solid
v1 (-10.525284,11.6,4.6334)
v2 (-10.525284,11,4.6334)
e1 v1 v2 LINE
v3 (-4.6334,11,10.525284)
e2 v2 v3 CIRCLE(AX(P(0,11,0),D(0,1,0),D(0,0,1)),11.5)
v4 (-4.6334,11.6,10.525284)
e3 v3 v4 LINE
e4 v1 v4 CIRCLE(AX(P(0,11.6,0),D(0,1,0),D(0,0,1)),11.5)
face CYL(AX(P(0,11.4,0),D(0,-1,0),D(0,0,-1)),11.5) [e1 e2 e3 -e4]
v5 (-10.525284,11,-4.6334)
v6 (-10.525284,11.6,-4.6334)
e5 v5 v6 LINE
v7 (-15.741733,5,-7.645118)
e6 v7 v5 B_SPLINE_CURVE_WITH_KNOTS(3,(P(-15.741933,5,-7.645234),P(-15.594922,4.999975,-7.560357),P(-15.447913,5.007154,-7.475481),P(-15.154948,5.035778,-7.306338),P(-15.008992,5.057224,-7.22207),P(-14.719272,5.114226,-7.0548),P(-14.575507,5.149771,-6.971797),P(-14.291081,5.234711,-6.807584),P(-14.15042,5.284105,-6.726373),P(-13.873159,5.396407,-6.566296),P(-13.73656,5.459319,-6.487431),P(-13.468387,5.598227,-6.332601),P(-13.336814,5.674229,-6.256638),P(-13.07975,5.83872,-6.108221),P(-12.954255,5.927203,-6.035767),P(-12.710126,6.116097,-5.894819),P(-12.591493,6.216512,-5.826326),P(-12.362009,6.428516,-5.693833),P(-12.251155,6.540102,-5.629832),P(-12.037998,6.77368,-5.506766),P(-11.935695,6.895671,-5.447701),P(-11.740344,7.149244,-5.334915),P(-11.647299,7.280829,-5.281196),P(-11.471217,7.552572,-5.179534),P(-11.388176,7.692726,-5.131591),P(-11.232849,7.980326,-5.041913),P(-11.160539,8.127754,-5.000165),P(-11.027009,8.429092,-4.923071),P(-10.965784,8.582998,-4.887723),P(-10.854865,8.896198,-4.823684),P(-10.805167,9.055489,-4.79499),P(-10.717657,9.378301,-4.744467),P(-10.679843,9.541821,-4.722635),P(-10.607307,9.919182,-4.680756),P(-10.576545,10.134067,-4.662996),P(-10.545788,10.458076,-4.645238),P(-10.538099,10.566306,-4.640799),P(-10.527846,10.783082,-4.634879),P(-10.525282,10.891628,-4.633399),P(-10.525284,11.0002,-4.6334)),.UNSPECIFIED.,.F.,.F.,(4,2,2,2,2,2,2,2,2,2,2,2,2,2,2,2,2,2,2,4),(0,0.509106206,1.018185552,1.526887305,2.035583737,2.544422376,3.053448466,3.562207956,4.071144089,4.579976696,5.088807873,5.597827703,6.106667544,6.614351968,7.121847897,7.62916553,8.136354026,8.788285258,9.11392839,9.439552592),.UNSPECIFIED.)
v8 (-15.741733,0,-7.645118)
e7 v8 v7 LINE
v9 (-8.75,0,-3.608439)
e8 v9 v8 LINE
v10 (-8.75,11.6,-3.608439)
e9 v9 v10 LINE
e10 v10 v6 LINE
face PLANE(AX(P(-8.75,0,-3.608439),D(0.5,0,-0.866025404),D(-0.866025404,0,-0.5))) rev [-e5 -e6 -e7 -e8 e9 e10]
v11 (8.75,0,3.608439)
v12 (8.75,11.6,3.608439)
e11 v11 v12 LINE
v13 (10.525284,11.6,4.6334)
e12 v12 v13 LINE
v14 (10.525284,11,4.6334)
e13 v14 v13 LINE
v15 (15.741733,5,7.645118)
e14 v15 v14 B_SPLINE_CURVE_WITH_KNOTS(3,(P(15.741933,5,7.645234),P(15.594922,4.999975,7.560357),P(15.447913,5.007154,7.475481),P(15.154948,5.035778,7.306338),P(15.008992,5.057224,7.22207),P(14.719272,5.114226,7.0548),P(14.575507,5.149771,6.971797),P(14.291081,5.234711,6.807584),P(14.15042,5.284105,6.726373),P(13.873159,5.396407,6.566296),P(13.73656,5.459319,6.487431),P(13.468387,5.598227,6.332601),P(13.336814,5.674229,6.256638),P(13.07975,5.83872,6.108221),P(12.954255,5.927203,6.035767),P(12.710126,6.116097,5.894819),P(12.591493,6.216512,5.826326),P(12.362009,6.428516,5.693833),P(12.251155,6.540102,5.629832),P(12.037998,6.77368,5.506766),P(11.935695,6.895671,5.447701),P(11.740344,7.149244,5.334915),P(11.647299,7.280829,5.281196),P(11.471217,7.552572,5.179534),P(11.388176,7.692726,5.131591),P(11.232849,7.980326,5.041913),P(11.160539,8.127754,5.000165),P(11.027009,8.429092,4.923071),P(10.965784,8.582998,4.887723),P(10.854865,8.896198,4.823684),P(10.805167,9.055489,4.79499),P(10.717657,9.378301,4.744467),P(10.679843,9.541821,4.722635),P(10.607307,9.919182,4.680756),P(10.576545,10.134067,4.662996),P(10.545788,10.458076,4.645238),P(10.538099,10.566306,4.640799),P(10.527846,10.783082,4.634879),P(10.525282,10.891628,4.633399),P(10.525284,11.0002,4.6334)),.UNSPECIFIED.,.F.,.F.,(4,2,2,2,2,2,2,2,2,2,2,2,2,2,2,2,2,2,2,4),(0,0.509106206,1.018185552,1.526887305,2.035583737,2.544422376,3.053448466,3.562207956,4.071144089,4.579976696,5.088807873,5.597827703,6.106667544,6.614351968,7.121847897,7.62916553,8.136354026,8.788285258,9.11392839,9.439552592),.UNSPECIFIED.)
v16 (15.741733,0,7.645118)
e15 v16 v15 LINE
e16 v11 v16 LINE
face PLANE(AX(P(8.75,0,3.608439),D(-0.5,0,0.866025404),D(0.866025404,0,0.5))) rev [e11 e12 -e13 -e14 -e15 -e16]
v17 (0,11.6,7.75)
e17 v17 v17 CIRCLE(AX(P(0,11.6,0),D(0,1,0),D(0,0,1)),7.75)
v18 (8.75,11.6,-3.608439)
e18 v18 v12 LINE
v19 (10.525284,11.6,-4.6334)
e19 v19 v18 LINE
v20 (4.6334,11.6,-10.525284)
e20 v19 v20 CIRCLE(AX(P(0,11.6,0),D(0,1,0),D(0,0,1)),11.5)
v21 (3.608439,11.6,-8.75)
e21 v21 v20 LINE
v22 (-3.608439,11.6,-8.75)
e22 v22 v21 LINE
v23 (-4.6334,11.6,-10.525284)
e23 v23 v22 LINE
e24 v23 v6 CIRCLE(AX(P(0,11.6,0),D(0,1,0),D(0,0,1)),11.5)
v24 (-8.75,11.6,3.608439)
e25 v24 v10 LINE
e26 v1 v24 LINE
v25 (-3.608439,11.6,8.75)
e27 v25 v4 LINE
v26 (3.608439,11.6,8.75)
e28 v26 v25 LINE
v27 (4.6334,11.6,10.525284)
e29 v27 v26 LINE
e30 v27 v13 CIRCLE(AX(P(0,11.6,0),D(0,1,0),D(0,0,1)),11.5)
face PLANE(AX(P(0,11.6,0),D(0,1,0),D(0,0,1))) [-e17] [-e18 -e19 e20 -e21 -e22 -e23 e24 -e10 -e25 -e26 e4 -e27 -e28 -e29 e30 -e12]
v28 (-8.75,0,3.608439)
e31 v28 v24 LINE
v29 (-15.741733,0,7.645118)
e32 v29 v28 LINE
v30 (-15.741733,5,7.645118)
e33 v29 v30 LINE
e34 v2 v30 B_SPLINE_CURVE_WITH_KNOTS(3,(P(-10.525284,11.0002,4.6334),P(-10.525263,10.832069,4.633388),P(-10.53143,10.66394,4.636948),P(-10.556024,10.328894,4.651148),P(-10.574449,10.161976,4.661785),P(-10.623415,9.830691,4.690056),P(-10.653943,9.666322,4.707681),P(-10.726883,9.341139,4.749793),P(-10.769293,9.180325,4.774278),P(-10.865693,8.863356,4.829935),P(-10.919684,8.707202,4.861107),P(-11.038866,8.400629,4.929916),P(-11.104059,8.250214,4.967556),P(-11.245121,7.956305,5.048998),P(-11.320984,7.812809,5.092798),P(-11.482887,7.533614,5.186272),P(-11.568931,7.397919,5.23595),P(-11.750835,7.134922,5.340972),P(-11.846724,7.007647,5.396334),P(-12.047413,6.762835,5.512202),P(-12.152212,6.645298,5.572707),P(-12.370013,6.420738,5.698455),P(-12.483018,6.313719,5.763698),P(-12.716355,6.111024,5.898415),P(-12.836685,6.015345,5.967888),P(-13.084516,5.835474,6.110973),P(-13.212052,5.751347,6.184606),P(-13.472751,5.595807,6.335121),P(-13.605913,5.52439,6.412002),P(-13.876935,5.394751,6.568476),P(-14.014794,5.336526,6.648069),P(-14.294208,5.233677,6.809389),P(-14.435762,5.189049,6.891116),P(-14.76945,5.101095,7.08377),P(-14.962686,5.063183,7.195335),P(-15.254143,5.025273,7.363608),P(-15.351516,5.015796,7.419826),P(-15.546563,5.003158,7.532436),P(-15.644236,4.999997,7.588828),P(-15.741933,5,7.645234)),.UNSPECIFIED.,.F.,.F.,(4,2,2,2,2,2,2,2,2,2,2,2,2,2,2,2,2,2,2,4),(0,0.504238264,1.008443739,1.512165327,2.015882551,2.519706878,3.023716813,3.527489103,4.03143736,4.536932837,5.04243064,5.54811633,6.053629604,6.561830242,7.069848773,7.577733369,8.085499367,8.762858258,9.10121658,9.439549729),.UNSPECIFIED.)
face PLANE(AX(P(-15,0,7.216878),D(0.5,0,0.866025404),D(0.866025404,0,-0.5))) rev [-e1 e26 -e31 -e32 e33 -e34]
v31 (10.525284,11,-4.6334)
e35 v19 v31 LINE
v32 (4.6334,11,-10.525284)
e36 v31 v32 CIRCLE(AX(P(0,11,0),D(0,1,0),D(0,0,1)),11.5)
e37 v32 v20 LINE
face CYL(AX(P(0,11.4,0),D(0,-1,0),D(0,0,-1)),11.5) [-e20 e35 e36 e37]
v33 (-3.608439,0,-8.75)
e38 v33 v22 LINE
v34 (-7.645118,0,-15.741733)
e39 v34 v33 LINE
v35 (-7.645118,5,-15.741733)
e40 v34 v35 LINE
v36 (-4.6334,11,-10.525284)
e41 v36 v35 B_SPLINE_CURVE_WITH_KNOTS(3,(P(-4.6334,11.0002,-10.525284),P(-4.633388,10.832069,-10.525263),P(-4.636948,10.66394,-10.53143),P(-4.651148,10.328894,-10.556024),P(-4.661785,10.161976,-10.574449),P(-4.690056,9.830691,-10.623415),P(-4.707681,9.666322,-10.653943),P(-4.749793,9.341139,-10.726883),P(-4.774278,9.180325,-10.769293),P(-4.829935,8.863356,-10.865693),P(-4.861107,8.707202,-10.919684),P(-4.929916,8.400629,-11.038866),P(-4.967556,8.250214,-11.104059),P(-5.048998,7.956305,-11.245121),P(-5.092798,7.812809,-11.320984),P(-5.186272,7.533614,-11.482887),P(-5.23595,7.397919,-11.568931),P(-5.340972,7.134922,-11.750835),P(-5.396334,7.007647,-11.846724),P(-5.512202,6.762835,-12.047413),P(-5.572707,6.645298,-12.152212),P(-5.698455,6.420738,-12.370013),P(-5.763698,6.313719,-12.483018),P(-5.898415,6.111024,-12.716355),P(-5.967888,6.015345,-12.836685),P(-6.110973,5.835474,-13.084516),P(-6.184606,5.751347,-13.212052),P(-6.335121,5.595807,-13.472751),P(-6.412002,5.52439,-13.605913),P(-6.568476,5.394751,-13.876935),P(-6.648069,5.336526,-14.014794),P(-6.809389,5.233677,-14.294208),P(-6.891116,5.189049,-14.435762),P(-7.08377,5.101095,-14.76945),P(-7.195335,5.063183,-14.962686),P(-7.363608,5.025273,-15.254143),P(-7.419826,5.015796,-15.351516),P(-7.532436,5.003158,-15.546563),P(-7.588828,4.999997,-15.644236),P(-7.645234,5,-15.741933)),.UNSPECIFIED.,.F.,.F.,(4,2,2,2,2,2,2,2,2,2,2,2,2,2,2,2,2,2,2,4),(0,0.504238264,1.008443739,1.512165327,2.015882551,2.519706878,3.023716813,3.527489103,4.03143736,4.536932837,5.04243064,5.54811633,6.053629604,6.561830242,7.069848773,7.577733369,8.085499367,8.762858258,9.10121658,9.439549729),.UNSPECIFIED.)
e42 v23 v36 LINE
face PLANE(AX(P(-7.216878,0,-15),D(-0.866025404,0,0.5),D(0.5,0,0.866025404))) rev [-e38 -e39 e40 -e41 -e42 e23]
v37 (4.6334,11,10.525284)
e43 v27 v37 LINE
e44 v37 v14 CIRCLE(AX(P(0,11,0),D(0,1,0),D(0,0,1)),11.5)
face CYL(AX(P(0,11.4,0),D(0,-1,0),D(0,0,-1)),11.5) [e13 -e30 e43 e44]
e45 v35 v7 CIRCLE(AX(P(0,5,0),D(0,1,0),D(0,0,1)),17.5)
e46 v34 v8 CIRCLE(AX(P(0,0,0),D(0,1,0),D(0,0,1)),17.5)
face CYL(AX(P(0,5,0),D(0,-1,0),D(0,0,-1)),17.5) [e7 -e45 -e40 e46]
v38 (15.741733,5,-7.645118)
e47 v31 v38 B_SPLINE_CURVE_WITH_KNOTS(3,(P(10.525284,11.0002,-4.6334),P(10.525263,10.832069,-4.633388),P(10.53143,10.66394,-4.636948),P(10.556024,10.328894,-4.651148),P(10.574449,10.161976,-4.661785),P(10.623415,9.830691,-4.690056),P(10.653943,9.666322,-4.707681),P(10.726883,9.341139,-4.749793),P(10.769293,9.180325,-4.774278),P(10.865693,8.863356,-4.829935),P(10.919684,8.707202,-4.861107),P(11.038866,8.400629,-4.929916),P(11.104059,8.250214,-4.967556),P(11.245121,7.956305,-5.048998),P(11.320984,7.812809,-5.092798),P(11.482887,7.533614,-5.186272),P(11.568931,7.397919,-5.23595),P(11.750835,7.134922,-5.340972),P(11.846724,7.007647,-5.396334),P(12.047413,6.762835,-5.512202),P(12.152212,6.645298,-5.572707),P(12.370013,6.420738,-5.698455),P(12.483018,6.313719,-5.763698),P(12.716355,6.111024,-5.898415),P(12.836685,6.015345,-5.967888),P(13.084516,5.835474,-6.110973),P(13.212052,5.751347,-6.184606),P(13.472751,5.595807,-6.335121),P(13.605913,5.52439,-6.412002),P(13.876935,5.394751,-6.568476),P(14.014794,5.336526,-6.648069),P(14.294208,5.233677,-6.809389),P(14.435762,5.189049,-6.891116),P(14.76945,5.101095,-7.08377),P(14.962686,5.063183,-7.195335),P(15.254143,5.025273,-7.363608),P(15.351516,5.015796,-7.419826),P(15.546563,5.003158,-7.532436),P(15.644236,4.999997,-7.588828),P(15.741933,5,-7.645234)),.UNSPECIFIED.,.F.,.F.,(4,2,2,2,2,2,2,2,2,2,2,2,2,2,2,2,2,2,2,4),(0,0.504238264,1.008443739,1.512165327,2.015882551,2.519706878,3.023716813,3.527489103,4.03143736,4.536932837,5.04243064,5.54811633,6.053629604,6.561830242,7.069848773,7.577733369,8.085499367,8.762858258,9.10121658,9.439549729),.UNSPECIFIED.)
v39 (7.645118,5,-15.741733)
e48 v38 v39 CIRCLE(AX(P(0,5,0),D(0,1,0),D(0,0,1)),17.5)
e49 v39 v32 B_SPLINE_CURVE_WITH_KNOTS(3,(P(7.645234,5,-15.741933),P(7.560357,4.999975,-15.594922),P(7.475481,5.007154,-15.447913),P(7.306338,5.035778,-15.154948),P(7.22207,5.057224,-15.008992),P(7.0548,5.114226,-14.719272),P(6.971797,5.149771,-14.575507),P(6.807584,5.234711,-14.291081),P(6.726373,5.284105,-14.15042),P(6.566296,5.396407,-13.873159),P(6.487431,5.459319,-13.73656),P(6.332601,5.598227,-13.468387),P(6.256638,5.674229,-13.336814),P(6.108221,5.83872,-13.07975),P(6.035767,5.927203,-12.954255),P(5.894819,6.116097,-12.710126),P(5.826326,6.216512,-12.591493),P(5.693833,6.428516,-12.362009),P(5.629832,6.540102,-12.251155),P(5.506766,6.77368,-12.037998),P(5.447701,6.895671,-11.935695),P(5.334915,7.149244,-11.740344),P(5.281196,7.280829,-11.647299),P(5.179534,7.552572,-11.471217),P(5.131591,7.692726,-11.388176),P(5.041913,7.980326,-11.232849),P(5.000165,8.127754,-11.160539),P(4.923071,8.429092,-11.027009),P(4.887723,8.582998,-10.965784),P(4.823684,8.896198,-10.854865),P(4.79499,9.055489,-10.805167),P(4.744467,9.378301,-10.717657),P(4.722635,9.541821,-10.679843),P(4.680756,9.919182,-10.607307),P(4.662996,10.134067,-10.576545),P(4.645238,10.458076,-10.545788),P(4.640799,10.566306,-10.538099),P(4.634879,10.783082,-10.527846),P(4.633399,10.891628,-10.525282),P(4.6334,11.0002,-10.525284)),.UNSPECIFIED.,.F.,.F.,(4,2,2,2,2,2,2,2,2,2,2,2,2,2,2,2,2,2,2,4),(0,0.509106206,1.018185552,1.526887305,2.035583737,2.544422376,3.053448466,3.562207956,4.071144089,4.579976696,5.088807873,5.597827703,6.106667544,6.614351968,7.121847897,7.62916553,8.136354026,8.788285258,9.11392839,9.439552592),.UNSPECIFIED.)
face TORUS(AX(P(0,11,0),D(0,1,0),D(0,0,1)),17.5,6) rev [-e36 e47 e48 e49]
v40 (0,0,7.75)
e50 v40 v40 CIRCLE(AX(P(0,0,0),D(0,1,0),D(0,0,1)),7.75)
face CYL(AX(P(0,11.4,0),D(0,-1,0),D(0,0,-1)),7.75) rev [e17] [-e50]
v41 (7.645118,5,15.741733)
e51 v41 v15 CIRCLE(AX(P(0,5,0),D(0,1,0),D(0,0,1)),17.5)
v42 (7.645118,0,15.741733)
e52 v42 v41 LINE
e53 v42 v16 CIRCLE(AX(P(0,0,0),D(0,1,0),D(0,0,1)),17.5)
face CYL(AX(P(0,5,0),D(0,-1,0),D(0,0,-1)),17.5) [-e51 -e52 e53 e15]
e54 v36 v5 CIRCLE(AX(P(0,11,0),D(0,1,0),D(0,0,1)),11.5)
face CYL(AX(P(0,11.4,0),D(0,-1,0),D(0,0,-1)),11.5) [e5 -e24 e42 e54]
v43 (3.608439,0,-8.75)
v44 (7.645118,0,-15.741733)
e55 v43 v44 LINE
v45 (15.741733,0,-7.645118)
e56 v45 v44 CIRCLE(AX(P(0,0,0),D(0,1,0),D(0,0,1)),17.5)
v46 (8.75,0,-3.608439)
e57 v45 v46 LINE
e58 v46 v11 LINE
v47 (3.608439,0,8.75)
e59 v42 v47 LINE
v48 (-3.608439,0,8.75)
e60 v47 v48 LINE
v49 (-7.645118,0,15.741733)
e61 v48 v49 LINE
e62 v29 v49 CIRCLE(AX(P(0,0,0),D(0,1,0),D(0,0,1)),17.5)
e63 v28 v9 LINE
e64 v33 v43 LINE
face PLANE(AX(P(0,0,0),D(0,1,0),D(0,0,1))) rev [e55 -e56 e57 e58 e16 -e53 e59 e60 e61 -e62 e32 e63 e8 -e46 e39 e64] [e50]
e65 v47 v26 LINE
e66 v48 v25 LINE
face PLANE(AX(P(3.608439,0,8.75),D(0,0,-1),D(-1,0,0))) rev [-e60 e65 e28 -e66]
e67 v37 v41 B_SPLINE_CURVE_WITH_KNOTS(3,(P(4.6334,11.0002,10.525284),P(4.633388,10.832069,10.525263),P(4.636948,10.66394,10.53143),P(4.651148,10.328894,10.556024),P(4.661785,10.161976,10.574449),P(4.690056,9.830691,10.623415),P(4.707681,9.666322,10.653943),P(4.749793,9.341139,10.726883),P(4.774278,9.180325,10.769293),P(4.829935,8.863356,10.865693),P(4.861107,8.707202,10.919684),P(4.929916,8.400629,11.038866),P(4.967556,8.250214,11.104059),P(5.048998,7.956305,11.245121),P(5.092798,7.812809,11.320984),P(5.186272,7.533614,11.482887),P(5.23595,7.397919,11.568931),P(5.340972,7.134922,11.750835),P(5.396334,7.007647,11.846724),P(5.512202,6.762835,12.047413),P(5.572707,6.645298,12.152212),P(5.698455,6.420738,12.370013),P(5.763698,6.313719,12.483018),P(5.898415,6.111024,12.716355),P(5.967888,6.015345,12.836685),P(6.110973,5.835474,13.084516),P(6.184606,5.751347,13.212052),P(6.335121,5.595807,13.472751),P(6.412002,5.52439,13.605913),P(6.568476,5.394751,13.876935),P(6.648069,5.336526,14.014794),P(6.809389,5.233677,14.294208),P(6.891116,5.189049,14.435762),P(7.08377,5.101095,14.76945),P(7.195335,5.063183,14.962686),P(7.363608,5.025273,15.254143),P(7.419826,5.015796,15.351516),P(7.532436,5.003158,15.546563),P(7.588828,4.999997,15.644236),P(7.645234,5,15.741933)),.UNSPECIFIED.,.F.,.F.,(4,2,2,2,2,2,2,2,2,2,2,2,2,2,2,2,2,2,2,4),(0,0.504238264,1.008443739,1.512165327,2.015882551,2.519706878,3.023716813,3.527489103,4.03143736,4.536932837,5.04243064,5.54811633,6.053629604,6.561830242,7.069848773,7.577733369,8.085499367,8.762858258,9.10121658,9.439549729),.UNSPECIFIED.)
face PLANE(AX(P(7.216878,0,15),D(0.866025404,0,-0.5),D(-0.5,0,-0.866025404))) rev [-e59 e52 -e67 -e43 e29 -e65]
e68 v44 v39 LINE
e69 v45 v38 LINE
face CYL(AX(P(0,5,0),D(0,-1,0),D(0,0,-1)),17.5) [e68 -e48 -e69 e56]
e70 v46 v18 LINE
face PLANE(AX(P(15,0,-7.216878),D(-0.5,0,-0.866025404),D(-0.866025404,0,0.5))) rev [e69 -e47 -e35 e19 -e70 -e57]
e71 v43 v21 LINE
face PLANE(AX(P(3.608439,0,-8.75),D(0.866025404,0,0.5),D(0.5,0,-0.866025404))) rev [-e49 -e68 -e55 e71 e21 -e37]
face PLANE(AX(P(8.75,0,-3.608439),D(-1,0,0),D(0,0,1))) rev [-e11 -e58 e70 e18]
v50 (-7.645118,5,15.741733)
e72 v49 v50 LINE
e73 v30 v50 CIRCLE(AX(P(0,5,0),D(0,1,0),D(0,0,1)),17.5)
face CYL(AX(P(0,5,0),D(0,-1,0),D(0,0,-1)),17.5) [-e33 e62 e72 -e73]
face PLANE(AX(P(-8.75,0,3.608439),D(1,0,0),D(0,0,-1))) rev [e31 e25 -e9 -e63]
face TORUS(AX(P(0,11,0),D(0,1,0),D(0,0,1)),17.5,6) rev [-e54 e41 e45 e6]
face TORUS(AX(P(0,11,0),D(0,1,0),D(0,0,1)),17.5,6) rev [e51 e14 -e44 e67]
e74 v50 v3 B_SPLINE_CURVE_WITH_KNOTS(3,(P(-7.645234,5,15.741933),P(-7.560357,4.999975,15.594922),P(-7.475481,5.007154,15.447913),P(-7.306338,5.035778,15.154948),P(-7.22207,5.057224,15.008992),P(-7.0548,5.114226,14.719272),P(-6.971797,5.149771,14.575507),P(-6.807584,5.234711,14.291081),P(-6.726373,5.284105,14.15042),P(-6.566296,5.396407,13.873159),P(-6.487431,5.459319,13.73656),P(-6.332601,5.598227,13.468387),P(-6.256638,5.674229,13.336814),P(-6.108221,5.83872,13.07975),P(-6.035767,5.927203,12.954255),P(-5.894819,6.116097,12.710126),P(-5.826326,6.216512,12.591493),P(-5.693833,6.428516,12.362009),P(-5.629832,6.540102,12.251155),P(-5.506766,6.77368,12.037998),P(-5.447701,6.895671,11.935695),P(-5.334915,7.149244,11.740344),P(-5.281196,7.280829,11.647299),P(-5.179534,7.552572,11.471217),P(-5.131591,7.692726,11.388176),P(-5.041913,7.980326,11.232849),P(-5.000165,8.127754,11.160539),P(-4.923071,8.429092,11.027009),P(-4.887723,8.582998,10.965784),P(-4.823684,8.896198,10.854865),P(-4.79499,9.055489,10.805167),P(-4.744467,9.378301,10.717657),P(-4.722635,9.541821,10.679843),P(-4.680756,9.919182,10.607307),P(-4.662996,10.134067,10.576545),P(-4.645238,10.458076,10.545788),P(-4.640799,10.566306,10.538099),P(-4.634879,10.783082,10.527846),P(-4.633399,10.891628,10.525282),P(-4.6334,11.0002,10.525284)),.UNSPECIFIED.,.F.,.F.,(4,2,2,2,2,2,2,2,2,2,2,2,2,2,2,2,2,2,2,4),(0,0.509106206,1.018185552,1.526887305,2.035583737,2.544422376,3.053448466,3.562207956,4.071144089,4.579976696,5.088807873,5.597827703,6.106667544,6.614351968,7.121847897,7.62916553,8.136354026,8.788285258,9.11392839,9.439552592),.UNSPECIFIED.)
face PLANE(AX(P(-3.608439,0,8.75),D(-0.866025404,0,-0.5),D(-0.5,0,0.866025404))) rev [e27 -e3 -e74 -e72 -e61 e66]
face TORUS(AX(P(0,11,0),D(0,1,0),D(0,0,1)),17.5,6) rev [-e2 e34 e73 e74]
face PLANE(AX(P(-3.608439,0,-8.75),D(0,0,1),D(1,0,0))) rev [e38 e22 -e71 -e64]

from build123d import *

# Parameters (mm, degrees)
SKETCH1_R           = 11.5
SKETCH1_R_2         = 7.75
BOSS_EXTRUDE1_DEPTH = 11.4
SKETCH2_R           = 11.5
SKETCH2_R_2         = 7.75
BOSS_EXTRUDE2_DEPTH = 0.2
SKETCH5_R           = 17.5
SKETCH5_R_2         = 7.75
BOSS_EXTRUDE3_DEPTH = 5
FILLET1_R           = 6
CUT_EXTRUDE2_DEPTH  = 28.332398358
CIRPATTERN1_COUNT   = 4


with BuildPart() as part:
    # Sketch1 → Boss-Extrude1 (new body)
    with BuildSketch(Plane(origin=(0, 0, 0), x_dir=(1, 0, 0), z_dir=(0, 1, 0))):
        with Locations(Location((0, 0, 0), (0, 0, 270))):
            Circle(SKETCH1_R)
        with Locations(Location((0, 0, 0), (0, 0, 270))):
            Circle(SKETCH1_R_2, mode=Mode.SUBTRACT)
    extrude(amount=BOSS_EXTRUDE1_DEPTH)

    # Sketch2 → Boss-Extrude2 (add)
    with BuildSketch(Plane(origin=(0, 11.4, 0), x_dir=(1, 0, 0), z_dir=(0, 1, 0))):
        with Locations(Location((0, 0, 0), (0, 0, 270))):
            Circle(SKETCH2_R)
        with Locations(Location((0, 0, 0), (0, 0, 270))):
            Circle(SKETCH2_R_2, mode=Mode.SUBTRACT)
    extrude(amount=BOSS_EXTRUDE2_DEPTH)

    # Sketch5 → Boss-Extrude3 (add)
    with BuildSketch(Plane(origin=(0, 0, 0), x_dir=(1, 0, 0), z_dir=(0, 1, 0))):
        with Locations(Location((0, 0, 0), (0, 0, 270))):
            Circle(SKETCH5_R)
        with Locations(Location((0, 0, 0), (0, 0, 270))):
            Circle(SKETCH5_R_2, mode=Mode.SUBTRACT)
    extrude(amount=BOSS_EXTRUDE3_DEPTH)

    # Fillet1
    fillet1_edges = [part.edges().sort_by_distance(p)[0] for p in [
        (0, 5, -11.5),
    ]]
    fillet(fillet1_edges, radius=FILLET1_R - 0.0001)  # a hair under: the kernel refuses the full size

    # Sketch6 → Cut-Extrude2 (cut, through all)
    with BuildSketch(Plane(origin=(0, 11.6, 0), x_dir=(1, 0, 0), z_dir=(0, 1, 0))):
        Polygon((3.608439182, 21.25), (-3.608439182, 21.25), (-7.645118273, 15.741733278), (-7.216878365, 15), (-3.608439182, 8.75), (3.608439182, 8.75), (7.216878365, 15), (7.645118273, 15.741733278), align=None)
    cut_extrude2 = extrude(amount=-CUT_EXTRUDE2_DEPTH, mode=Mode.SUBTRACT)

    # CirPattern1: Cut-Extrude2 ×4 about axis
    cirpattern1_axis = Axis((0, 0, 0), (0, 1, 0))
    for i in range(1, CIRPATTERN1_COUNT):
        add(cut_extrude2.rotate(cirpattern1_axis, i * 360 / CIRPATTERN1_COUNT), mode=Mode.SUBTRACT)


solid = part.part
